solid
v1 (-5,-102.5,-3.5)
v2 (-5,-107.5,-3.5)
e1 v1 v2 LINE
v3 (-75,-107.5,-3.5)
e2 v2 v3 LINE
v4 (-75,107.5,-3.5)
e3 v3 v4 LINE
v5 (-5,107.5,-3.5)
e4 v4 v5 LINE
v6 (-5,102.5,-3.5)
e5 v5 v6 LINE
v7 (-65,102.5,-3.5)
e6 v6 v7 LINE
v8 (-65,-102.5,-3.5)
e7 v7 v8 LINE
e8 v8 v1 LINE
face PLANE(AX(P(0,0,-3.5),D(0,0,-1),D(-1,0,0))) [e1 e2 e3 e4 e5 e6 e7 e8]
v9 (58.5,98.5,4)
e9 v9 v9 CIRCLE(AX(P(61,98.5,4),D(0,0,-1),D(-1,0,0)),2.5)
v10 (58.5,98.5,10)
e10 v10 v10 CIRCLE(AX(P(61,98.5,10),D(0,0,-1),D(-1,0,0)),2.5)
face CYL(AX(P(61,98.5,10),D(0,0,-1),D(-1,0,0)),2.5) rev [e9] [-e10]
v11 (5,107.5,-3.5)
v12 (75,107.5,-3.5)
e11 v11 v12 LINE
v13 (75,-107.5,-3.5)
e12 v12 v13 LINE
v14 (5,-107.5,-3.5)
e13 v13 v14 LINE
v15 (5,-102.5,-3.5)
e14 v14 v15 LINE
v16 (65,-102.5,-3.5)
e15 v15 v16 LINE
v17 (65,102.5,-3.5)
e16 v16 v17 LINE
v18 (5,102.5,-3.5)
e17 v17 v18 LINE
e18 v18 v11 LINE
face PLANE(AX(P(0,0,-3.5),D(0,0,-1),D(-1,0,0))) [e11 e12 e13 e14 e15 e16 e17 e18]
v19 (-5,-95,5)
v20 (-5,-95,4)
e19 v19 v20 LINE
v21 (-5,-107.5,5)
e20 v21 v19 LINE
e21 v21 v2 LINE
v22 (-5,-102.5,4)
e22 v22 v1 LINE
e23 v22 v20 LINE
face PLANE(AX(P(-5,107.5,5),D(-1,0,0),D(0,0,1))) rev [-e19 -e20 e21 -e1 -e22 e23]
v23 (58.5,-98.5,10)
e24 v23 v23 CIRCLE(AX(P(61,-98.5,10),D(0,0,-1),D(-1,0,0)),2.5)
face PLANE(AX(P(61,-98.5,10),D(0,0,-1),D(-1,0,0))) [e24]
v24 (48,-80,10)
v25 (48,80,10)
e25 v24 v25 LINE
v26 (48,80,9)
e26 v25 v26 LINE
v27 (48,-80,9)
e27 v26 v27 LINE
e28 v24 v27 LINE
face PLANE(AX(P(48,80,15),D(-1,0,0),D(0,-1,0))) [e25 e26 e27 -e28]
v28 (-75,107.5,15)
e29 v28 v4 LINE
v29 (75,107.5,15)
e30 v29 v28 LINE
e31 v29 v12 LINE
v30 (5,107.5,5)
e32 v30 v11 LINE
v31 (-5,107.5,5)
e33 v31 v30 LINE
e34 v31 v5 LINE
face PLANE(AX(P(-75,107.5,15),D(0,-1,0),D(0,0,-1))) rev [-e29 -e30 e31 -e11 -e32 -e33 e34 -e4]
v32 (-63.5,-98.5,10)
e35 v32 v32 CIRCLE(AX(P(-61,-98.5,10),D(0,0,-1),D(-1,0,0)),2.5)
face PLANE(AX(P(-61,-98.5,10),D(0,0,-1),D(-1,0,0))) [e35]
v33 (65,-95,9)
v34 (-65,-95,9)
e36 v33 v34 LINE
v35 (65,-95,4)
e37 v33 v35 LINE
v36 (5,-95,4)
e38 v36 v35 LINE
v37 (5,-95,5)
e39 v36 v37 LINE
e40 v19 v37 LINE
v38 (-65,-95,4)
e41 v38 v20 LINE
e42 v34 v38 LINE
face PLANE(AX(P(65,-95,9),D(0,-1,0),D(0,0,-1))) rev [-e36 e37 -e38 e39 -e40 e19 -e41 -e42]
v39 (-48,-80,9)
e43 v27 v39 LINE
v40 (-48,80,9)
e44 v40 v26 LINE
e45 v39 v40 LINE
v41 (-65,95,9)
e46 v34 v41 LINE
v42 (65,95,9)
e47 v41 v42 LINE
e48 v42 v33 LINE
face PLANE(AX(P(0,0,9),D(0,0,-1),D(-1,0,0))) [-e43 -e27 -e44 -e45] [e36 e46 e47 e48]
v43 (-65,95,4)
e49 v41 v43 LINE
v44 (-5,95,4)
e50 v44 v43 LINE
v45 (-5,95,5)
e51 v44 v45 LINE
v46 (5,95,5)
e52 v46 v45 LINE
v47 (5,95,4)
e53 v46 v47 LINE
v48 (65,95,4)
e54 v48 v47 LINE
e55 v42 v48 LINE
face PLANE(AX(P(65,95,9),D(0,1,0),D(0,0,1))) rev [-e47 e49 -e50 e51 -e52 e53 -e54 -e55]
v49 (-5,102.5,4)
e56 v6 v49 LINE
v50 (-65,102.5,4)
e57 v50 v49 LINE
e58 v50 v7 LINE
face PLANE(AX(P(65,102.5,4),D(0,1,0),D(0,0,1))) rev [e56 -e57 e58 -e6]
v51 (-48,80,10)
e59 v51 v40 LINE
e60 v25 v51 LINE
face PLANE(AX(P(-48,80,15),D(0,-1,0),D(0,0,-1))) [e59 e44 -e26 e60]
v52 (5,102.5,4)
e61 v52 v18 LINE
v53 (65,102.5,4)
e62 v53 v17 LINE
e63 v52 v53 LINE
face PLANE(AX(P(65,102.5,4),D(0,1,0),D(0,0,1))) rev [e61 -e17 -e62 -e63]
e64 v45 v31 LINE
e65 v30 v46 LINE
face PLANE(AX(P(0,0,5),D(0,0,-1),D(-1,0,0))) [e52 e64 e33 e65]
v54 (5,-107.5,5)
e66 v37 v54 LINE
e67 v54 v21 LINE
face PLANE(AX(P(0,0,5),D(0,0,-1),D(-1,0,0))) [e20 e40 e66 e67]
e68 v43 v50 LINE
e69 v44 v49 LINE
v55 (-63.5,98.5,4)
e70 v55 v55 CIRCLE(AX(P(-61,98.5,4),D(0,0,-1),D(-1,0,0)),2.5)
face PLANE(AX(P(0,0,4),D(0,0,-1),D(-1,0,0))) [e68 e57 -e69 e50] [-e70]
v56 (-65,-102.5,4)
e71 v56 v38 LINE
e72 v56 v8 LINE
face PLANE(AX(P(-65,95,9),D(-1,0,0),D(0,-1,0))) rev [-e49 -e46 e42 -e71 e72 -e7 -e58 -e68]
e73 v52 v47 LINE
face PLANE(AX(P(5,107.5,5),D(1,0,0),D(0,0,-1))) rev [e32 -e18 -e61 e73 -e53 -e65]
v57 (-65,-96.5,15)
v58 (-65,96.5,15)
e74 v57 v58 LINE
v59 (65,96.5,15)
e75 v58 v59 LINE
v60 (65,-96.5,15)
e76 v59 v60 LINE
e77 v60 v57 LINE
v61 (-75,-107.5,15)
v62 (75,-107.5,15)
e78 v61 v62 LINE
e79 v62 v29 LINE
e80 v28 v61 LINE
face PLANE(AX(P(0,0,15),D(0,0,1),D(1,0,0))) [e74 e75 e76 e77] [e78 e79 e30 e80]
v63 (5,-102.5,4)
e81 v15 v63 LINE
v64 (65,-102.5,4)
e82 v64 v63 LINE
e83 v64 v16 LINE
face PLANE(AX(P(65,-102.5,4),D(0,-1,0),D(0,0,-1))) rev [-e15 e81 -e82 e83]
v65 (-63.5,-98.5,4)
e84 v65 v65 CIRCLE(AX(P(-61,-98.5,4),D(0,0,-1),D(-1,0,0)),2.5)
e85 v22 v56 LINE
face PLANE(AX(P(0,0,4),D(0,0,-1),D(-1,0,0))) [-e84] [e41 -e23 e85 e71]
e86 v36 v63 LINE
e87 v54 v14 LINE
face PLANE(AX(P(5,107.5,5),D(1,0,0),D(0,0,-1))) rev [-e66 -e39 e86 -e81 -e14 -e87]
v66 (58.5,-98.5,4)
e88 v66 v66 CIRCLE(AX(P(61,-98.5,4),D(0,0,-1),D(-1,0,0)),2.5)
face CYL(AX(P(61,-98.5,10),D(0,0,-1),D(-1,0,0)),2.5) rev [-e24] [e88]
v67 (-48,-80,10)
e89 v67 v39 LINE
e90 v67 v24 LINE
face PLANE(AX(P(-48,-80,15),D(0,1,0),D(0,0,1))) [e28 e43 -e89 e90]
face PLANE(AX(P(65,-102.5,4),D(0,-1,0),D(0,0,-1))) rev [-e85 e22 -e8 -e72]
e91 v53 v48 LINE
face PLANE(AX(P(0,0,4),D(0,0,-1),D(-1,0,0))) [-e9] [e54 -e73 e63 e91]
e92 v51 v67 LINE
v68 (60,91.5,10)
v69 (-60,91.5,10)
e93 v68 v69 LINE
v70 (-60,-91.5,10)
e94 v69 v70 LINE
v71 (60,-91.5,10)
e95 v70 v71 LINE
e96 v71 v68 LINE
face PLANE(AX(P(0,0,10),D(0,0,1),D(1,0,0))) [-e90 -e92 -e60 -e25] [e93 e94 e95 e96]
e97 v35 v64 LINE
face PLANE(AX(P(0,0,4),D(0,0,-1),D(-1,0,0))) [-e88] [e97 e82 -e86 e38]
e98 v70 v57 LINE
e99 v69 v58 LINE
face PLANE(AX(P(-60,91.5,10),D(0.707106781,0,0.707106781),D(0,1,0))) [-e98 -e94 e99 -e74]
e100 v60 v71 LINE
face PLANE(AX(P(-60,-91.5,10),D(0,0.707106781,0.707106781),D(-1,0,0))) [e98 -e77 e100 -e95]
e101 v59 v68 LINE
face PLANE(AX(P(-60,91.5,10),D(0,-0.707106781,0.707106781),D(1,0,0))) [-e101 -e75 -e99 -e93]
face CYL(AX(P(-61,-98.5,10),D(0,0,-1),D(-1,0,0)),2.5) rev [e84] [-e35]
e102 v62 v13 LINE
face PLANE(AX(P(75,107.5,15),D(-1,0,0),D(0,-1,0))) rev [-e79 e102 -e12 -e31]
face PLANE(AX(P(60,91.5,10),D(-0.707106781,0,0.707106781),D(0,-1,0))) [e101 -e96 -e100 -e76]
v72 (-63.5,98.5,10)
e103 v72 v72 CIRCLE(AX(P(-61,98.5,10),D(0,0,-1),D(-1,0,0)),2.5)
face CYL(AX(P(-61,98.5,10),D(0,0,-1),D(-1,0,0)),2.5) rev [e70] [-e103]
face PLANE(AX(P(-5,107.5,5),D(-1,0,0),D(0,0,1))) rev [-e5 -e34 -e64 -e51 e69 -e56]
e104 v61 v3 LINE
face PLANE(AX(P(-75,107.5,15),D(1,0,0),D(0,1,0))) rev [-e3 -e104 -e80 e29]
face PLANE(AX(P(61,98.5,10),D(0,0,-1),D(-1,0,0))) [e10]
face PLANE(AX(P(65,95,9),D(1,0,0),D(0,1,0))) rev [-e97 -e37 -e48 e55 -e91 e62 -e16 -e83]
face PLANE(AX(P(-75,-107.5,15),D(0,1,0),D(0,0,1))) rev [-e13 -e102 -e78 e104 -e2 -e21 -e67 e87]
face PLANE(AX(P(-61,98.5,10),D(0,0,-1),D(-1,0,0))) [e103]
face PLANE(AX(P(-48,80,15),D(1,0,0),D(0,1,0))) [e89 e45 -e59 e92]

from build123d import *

# Parameters (mm, degrees)
SKETCH_1_W          = 150
SKETCH_1_H          = 215
SKETCH_1_W_2        = 96
SKETCH_1_H_2        = 160
EXTRUDE_1_DEPTH     = 15
SKETCH_2_W          = 120
SKETCH_2_H          = 183
CUT_EXTRUDE_1_DEPTH = 5
CHAMFER_1_SIZE      = 5
SKETCH_5_W          = 130
SKETCH_5_H          = 190
CUT_EXTRUDE_2_DEPTH = 9
SKETCH_9_W          = 130
SKETCH_9_H          = 205
CUT_EXTRUDE_6_DEPTH = 4
SKETCH_10_R         = 2.5
CUT_EXTRUDE_7_DEPTH = 6
SKETCH_11_W         = 10
SKETCH_11_H         = 215
CUT_EXTRUDE_8_DEPTH = 5
EXTRUDE_2_DEPTH     = 3.5


with BuildPart() as part:
    # 草图1 → 凸台-拉伸1 (new body)
    with BuildSketch(Plane.XY):
        Rectangle(SKETCH_1_W, SKETCH_1_H)
        Rectangle(SKETCH_1_W_2, SKETCH_1_H_2, mode=Mode.SUBTRACT)
    extrude(amount=EXTRUDE_1_DEPTH)

    # 草图2 → 切除-拉伸1 (cut)
    with BuildSketch(Plane.XY.offset(15)):
        Rectangle(SKETCH_2_W, SKETCH_2_H)
    extrude(amount=-CUT_EXTRUDE_1_DEPTH, mode=Mode.SUBTRACT)

    # 倒角1
    chamfer_1_edges = [part.edges().sort_by_distance(p)[0] for p in [
        (0, -91.5, 15),
        (60, 0, 15),
        (-60, 0, 15),
        (0, 91.5, 15),
    ]]
    chamfer(chamfer_1_edges, length=CHAMFER_1_SIZE - 0.0001)  # a hair under: the kernel refuses the full size

    # 草图5 → 切除-拉伸2 (cut)
    with BuildSketch(Plane(origin=(0, 0, 0), x_dir=(-1, 0, 0), z_dir=(0, 0, -1))):
        Rectangle(SKETCH_5_W, SKETCH_5_H)
    extrude(amount=-CUT_EXTRUDE_2_DEPTH, mode=Mode.SUBTRACT)

    # 草图9 → 切除-拉伸6 (cut)
    with BuildSketch(Plane(origin=(0, 0, 0), x_dir=(-1, 0, 0), z_dir=(0, 0, -1))):
        Rectangle(SKETCH_9_W, SKETCH_9_H)
    extrude(amount=-CUT_EXTRUDE_6_DEPTH, mode=Mode.SUBTRACT)

    # 草图10 → 切除-拉伸7 (cut)
    with BuildSketch(Plane(origin=(0, 0, 4), x_dir=(-1, 0, 0), z_dir=(0, 0, -1))):
        with Locations((61, 98.5)):
            Circle(SKETCH_10_R)
        with Locations((-61, 98.5)):
            Circle(SKETCH_10_R)
        with Locations((-61, -98.5)):
            Circle(SKETCH_10_R)
        with Locations((61, -98.5)):
            Circle(SKETCH_10_R)
    extrude(amount=-CUT_EXTRUDE_7_DEPTH, mode=Mode.SUBTRACT)

    # 草图11 → 切除-拉伸8 (cut)
    with BuildSketch(Plane(origin=(0, 0, 0), x_dir=(-1, 0, 0), z_dir=(0, 0, -1))):
        Rectangle(SKETCH_11_W, SKETCH_11_H)
    extrude(amount=-CUT_EXTRUDE_8_DEPTH, mode=Mode.SUBTRACT)

    # 草图12 → 凸台-拉伸2 (add)
    with BuildSketch(Plane(origin=(0, 0, 0), x_dir=(-1, 0, 0), z_dir=(0, 0, -1))):
        Polygon((-5, 107.5), (-75, 107.5), (-75, -107.5), (-5, -107.5), (-5, -102.5), (-65, -102.5), (-65, 102.5), (-5, 102.5), align=None)
        Polygon((5, -102.5), (5, -107.5), (75, -107.5), (75, 107.5), (5, 107.5), (5, 102.5), (65, 102.5), (65, -102.5), align=None)
    extrude(amount=EXTRUDE_2_DEPTH)


solid = part.part
